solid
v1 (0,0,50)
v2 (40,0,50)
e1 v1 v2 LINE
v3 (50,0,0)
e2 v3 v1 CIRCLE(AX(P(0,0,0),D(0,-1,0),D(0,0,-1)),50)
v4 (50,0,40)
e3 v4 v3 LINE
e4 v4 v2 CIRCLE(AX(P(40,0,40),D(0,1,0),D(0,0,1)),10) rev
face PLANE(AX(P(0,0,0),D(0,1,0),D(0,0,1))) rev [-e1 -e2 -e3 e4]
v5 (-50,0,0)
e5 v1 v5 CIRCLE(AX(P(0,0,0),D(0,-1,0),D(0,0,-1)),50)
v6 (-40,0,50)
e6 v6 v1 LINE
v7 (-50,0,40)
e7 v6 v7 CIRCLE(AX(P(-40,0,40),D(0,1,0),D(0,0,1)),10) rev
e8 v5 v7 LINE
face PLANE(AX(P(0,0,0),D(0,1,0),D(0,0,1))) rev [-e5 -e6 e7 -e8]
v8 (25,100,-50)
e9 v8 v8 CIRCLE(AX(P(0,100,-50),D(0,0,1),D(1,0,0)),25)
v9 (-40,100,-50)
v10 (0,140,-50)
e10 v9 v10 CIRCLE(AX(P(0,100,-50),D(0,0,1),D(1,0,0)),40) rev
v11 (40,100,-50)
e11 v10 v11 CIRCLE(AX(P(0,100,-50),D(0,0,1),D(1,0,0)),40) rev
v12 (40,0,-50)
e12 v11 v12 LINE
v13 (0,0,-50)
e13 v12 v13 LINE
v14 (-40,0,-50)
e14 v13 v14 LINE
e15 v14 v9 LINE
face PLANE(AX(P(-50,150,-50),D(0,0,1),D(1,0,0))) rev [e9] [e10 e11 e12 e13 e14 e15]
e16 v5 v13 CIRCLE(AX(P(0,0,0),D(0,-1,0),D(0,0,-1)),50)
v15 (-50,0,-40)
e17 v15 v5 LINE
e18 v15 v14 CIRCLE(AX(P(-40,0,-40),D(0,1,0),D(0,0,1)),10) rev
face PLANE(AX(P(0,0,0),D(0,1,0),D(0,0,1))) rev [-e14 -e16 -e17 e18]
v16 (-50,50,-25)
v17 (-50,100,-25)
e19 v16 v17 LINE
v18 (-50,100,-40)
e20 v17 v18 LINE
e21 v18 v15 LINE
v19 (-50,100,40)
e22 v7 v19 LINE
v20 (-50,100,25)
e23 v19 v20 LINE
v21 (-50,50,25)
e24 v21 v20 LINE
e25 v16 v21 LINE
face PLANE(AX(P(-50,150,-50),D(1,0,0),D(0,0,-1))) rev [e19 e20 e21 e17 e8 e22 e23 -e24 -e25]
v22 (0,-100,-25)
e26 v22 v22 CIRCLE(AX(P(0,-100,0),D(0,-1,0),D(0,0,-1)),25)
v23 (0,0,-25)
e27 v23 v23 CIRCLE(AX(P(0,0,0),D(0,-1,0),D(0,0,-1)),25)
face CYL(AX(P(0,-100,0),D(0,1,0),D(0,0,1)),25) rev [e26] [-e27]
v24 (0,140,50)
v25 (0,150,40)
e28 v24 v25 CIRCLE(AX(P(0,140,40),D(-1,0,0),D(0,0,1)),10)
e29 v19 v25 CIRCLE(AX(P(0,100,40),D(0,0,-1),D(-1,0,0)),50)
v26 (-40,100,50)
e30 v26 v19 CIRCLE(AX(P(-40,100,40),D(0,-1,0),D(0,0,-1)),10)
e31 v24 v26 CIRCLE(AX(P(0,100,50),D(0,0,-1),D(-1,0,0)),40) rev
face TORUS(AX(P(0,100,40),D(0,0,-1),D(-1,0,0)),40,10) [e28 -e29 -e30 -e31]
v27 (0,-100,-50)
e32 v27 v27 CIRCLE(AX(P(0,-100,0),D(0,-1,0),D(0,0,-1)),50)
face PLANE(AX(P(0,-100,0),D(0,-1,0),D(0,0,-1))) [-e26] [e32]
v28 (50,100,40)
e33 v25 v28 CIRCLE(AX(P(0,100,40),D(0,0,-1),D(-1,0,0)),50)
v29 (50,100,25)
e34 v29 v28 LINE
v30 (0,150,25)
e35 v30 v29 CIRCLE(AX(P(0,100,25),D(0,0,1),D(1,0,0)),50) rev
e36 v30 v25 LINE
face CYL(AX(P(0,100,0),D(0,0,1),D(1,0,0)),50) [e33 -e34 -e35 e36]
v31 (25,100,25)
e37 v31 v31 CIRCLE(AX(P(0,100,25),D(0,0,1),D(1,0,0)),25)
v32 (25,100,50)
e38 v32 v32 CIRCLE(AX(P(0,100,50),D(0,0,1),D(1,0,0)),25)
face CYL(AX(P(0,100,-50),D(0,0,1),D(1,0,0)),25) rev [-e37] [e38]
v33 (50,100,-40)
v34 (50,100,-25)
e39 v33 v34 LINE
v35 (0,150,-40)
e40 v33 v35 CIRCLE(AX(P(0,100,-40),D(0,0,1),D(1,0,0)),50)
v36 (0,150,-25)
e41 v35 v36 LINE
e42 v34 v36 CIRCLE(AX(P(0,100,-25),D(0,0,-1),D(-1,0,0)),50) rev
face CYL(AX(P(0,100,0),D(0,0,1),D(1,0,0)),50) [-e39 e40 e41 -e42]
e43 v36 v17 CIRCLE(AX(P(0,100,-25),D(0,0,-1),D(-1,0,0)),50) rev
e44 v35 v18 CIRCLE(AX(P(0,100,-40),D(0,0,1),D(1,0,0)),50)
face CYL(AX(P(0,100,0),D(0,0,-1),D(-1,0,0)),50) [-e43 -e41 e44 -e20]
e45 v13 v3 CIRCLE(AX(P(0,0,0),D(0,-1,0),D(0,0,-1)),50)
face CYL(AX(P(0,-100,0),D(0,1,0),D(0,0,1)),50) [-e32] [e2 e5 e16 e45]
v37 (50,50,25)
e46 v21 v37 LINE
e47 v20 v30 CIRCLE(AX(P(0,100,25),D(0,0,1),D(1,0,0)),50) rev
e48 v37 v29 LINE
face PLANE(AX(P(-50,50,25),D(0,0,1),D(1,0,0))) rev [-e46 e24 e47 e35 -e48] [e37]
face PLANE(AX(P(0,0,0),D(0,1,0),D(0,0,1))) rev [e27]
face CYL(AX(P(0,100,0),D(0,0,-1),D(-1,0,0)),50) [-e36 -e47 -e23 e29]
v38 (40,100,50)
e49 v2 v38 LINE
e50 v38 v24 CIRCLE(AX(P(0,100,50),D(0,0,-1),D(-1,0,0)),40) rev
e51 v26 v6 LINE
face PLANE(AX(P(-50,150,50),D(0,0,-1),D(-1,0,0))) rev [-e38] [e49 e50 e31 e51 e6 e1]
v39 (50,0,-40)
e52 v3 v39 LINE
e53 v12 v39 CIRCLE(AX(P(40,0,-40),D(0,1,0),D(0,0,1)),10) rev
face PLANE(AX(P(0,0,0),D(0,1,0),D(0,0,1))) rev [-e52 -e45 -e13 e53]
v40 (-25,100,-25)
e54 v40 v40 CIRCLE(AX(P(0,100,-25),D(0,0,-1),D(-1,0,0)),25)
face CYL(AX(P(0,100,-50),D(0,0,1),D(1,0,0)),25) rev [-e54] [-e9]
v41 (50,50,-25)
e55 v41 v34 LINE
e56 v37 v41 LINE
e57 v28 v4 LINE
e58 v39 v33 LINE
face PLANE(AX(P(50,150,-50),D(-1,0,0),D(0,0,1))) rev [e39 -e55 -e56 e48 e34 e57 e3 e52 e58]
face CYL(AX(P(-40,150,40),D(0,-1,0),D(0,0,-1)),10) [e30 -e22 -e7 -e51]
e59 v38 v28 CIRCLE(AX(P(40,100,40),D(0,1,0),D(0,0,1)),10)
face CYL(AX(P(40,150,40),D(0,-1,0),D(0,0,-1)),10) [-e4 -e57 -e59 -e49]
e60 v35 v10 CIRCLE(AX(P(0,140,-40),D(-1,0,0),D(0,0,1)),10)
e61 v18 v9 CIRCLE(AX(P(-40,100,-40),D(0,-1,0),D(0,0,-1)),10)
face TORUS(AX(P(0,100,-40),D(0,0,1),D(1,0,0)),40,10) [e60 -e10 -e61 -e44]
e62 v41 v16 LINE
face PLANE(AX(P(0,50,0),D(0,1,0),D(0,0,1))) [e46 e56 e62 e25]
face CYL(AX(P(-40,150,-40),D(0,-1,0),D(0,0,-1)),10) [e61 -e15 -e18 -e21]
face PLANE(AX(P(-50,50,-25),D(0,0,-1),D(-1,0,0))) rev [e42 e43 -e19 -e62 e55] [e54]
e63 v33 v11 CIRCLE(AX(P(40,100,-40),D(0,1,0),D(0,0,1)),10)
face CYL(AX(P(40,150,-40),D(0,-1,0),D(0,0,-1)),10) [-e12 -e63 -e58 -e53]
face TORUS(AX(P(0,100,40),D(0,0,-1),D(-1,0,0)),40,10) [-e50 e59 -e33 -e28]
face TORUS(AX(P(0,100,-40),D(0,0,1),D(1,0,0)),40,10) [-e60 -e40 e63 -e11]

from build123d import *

# Parameters (mm, degrees)
SKETCH1_W           = 100
SKETCH1_H           = 100
BOSS_EXTRUDE1_DEPTH = 150
SKETCH2_R           = 50
SKETCH2_R_2         = 25
BOSS_EXTRUDE2_DEPTH = 100
SKETCH3_W           = 100
SKETCH3_H           = 50
CUT_EXTRUDE1_DEPTH  = 100
SKETCH4_R           = 25
CUT_EXTRUDE2_DEPTH  = 188.082869339
FILLET1_R           = 50
FILLET2_R           = 10


with BuildPart() as part:
    # Sketch1 → Boss-Extrude1 (new body)
    with BuildSketch(Plane(origin=(0, 0, 0), x_dir=(1, 0, 0), z_dir=(0, 1, 0))):
        Rectangle(SKETCH1_W, SKETCH1_H)
    extrude(amount=BOSS_EXTRUDE1_DEPTH)

    # Sketch2 → Boss-Extrude2 (add)
    with BuildSketch(Plane.XZ):
        with Locations(Location((0, 0, 0), (0, 0, 270))):
            Circle(SKETCH2_R)
        with Locations(Location((0, 0, 0), (0, 0, 270))):
            Circle(SKETCH2_R_2, mode=Mode.SUBTRACT)
    extrude(amount=BOSS_EXTRUDE2_DEPTH)

    # Sketch3 → Cut-Extrude1 (cut)
    with BuildSketch(Plane(origin=(0, 150, 0), x_dir=(1, 0, 0), z_dir=(0, 1, 0))):
        Rectangle(SKETCH3_W, SKETCH3_H)
    extrude(amount=-CUT_EXTRUDE1_DEPTH, mode=Mode.SUBTRACT)

    # Sketch4 → Cut-Extrude2 (cut, through all)
    with BuildSketch(Plane.XY.offset(50)):
        with Locations((0, 100)):
            Circle(SKETCH4_R)
    extrude(amount=-CUT_EXTRUDE2_DEPTH, mode=Mode.SUBTRACT)

    # Fillet1
    fillet1_edges = [part.edges().sort_by_distance(p)[0] for p in [
        (50, 150, 37.5),
        (50, 150, -37.5),
        (-50, 150, -37.5),
        (-50, 150, 37.5),
    ]]
    fillet(fillet1_edges, radius=FILLET1_R - 0.0001)  # a hair under: the kernel refuses the full size

    # Fillet2
    fillet2_edges = [part.edges().sort_by_distance(p)[0] for p in [
        (50, 50.00005, 50),
        (50, 50.00005, -50),
        (-50, 50.00005, 50),
        (-35.355368349, 135.355368349, 50),
        (35.355368349, 135.355368349, 50),
        (-50, 50.00005, -50),
        (-35.355368349, 135.355368349, -50),
        (35.355368349, 135.355368349, -50),
    ]]
    fillet(fillet2_edges, radius=FILLET2_R)


solid = part.part
